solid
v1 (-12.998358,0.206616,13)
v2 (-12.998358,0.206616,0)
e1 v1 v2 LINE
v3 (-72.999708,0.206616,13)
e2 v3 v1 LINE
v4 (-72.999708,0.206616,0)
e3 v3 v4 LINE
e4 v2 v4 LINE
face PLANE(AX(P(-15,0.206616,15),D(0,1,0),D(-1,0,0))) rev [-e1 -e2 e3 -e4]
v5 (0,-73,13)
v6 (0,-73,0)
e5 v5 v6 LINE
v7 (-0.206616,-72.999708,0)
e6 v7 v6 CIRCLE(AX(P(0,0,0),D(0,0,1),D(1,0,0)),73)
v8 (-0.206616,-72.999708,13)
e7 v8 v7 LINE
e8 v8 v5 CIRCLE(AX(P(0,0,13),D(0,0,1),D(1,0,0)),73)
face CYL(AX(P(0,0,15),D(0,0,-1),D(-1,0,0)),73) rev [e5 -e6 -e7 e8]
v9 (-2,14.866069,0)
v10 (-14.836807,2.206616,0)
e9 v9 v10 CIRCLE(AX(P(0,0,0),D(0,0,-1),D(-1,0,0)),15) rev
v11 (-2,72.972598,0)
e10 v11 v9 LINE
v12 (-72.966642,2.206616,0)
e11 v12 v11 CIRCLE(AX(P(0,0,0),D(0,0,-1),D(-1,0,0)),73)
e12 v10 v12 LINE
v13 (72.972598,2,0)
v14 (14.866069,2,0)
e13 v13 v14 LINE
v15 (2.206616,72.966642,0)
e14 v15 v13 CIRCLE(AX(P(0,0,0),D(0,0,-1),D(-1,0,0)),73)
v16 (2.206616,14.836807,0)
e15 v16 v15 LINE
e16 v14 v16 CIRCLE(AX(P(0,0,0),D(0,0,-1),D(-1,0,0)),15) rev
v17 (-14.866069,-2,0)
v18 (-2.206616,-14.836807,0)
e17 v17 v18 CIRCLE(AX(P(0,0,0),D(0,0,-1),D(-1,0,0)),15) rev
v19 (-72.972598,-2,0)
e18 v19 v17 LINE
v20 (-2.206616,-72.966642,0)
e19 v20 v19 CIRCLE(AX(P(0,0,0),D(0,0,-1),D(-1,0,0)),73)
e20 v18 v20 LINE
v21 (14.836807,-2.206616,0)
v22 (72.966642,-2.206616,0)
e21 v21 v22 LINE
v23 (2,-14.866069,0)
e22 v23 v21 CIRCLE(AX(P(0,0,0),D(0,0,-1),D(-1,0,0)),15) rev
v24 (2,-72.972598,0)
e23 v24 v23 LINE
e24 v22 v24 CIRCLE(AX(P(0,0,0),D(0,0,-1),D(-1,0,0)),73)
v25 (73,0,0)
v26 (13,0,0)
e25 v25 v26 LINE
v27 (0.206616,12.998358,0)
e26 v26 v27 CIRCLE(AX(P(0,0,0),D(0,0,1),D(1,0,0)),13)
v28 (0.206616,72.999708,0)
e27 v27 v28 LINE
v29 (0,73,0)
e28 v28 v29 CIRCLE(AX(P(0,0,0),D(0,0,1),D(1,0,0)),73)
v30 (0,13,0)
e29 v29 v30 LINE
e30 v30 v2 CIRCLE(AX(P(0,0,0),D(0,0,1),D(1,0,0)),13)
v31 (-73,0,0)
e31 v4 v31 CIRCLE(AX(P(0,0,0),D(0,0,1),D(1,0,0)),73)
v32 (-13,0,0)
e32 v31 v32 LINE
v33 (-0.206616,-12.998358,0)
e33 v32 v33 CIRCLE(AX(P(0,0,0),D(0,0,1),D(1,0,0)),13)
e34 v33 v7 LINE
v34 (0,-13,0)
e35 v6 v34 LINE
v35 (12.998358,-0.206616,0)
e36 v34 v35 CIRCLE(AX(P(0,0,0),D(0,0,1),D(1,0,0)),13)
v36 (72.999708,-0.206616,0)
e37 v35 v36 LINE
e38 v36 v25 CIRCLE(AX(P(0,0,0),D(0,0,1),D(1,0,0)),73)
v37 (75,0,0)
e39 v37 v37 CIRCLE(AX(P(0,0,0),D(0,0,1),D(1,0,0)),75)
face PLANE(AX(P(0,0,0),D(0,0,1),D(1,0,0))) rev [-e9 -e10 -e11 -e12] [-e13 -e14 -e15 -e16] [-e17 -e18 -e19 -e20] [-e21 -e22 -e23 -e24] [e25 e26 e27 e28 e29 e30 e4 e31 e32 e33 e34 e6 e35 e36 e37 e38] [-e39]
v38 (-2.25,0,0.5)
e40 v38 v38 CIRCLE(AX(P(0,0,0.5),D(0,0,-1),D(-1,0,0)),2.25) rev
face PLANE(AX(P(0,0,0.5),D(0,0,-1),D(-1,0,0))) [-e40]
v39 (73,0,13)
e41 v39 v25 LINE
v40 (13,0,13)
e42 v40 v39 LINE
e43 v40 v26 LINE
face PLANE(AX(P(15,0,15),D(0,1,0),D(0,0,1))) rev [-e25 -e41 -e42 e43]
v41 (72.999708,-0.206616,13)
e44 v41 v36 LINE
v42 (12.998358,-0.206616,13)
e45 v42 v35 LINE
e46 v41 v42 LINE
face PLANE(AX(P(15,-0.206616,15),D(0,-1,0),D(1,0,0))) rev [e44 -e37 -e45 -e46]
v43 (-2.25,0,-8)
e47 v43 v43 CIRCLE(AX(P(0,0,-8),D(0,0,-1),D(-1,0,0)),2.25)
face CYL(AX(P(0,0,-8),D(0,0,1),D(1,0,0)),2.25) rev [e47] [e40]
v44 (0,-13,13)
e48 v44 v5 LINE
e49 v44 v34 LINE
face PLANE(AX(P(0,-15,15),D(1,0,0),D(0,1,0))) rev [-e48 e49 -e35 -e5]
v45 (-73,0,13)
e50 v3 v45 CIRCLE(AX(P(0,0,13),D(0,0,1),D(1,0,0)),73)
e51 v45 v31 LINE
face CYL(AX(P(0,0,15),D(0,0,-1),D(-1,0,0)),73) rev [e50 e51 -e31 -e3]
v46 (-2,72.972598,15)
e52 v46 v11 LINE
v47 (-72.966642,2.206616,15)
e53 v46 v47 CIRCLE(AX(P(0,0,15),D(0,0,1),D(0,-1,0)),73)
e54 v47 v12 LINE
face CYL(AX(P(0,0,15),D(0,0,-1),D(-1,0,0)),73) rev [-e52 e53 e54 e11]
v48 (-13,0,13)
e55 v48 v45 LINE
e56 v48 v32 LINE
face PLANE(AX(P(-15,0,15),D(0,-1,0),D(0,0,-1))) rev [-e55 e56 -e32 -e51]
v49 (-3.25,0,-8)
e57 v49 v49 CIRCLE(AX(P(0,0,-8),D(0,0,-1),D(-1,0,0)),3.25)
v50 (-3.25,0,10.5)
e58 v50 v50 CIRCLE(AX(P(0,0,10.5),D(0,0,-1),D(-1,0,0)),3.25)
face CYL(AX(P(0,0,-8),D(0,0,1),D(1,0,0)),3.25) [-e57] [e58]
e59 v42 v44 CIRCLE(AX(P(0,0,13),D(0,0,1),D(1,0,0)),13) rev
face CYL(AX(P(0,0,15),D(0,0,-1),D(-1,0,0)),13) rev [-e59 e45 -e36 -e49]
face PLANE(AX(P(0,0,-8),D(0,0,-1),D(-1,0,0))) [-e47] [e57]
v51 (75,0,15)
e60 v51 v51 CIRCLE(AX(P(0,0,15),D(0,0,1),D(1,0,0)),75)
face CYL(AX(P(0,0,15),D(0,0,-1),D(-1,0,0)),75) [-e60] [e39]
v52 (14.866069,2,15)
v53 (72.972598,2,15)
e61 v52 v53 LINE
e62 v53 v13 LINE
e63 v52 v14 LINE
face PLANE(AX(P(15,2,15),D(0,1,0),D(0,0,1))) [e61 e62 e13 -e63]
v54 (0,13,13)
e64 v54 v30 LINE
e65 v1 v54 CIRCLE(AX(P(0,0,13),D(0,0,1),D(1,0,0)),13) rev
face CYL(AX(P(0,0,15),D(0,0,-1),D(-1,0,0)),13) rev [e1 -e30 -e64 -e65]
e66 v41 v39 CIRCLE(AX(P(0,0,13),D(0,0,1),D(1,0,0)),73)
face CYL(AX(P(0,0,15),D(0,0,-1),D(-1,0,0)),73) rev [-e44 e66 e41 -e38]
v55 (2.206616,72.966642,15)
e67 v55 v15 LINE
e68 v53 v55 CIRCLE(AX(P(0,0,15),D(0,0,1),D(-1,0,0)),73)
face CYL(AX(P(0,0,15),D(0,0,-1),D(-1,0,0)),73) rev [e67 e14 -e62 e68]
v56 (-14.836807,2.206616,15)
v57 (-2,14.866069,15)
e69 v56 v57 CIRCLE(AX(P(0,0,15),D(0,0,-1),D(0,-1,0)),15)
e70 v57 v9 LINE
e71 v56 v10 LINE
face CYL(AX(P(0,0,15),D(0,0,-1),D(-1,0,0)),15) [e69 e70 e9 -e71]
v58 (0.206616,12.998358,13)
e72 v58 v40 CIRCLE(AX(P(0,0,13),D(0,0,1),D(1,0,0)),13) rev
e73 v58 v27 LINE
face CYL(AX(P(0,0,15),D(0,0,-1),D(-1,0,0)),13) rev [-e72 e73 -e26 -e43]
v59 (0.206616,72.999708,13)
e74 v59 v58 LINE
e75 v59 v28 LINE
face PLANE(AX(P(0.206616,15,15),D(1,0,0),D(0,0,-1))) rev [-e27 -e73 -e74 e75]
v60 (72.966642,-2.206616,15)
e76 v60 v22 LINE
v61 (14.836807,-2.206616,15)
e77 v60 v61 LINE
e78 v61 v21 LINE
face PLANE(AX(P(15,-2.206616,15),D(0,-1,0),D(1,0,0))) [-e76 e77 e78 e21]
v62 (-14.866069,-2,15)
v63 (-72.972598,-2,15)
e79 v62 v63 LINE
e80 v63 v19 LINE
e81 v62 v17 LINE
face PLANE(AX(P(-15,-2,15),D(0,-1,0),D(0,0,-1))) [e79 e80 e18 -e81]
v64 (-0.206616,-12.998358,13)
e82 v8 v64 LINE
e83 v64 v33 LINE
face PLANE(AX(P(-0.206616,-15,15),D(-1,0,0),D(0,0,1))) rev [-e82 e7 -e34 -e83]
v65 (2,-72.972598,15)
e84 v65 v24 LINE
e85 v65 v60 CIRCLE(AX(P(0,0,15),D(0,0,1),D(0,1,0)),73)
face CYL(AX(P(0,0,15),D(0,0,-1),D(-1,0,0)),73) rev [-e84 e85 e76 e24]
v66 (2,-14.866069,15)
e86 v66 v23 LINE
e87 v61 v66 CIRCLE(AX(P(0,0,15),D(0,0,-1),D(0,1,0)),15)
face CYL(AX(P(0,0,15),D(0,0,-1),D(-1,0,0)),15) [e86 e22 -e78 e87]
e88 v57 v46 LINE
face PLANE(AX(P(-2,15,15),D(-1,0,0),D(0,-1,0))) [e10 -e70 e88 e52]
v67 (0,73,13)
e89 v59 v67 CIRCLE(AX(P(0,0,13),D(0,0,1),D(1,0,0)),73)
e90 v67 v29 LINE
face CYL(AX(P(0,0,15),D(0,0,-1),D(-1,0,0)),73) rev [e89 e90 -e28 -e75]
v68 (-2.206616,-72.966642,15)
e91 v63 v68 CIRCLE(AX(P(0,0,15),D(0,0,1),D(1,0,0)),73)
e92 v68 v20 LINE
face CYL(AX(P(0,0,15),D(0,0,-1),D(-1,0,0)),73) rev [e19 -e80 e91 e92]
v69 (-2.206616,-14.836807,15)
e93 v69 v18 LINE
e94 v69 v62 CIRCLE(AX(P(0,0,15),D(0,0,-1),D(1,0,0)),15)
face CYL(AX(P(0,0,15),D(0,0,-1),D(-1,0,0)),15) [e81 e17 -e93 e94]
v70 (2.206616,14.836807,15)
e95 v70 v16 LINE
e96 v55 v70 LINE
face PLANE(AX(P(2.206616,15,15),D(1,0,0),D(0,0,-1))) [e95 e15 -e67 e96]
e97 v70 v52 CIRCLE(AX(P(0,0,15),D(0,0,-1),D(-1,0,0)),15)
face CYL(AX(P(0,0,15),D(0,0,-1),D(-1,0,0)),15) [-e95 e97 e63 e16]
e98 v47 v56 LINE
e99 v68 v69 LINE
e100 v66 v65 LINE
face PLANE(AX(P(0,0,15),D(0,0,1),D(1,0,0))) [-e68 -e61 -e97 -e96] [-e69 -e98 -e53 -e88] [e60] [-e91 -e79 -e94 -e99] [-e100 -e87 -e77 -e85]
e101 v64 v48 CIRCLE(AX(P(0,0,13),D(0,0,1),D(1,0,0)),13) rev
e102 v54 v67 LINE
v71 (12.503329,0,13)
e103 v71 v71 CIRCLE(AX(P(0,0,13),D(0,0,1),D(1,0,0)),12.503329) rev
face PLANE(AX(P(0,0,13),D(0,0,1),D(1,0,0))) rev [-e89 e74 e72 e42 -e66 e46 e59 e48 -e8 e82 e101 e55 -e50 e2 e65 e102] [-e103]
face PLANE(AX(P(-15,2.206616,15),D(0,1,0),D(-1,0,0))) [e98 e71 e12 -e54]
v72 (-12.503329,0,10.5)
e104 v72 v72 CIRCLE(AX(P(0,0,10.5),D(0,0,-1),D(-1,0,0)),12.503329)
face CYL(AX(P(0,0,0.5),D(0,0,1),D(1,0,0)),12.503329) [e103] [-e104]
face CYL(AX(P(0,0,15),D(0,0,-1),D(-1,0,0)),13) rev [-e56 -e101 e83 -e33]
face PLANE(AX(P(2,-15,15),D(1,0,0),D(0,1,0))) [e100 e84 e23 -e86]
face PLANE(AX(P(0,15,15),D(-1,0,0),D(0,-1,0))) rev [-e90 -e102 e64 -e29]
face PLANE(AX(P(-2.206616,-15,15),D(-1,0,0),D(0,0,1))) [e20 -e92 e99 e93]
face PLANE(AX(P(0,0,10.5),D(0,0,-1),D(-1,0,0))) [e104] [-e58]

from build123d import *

# Parameters (mm, degrees)
SKETCH4_R           = 75
BOSS_EXTRUDE2_DEPTH = 15
CUT_EXTRUDE1_DEPTH  = 108.121426428
CIRPATTERN1_COUNT   = 4
SHELL1_DEPTH        = 13
SKETCH7_R           = 12.503328754
BOSS_EXTRUDE3_DEPTH = 12.5
SKETCH8_R           = 3.25
SKETCH8_R_2         = 2.25
BOSS_EXTRUDE4_DEPTH = 8.5
CUT_EXTRUDE2_START  = -10
SKETCH9_R           = 12.503328754
SKETCH9_R_2         = 3.25
CUT_EXTRUDE2_DEPTH  = 10


# Read off the part's stored shape, not the designer's step: Shell1
with BuildPart() as part:
    # Sketch4 → Boss-Extrude2 (new body)
    with BuildSketch(Plane.XY):
        Circle(SKETCH4_R)
    extrude(amount=BOSS_EXTRUDE2_DEPTH)

    # Sketch6 → Cut-Extrude1 (cut, symmetric)
    with BuildSketch(Plane.XY):
        with BuildLine():
            Line((2.206615595, 15), (2.206615595, 69.72932719))
            Line((2.206615595, 69.72932719), (2.206615595, 72.96664202))
            ThreePointArc((2.206615595, 72.96664202), (51.691823279, 51.54566331), (72.972597597, 2))
            Line((72.972597597, 2), (15, 2))
            Line((15, 2), (14.866068747, 2))
            ThreePointArc((14.866068747, 2), (10.680123706, 10.532566526), (2.206615595, 14.836807191))
            Line((2.206615595, 14.836807191), (2.206615595, 15))
        make_face()
    cut_extrude1 = extrude(amount=CUT_EXTRUDE1_DEPTH, both=True, mode=Mode.SUBTRACT)

    # CirPattern1: Cut-Extrude1 ×4 about axis
    cirpattern1_axis = Axis((0, 0, 0), (0, 0, 1))
    for i in range(1, CIRPATTERN1_COUNT):
        add(cut_extrude1.rotate(cirpattern1_axis, i * 360 / CIRPATTERN1_COUNT), mode=Mode.SUBTRACT)

    # Shell1 outline → Shell1 (cut)
    with BuildSketch(Plane.XY):
        with BuildLine():
            ThreePointArc((-0.206615595, -72.999707602), (-0.103307901, -72.9999269), (0, -73))
            Line((0, -73), (0, -13))
            ThreePointArc((0, -13), (9.119045928, -9.26514983), (12.998357973, -0.206615595))
            Line((12.998357973, -0.206615595), (72.999707602, -0.206615595))
            ThreePointArc((72.999707602, -0.206615595), (72.9999269, -0.103307901), (73, 0))
            Line((73, 0), (13, 0))
            ThreePointArc((13, 0), (9.26514983, 9.119045928), (0.206615595, 12.998357973))
            Line((0.206615595, 12.998357973), (0.206615595, 72.999707602))
            ThreePointArc((0.206615595, 72.999707602), (0.103307901, 72.9999269), (0, 73))
            Line((0, 73), (0, 13))
            ThreePointArc((0, 13), (-9.119045928, 9.26514983), (-12.998357973, 0.206615595))
            Line((-12.998357973, 0.206615595), (-72.999707602, 0.206615595))
            ThreePointArc((-72.999707602, 0.206615595), (-72.9999269, 0.103307901), (-73, 0))
            Line((-73, 0), (-13, 0))
            ThreePointArc((-13, 0), (-9.26514983, -9.119045928), (-0.206615595, -12.998357973))
            Line((-0.206615595, -12.998357973), (-0.206615595, -72.999707602))
        make_face()
    extrude(amount=SHELL1_DEPTH, mode=Mode.SUBTRACT)

    # Sketch7 → Boss-Extrude3 (add)
    with BuildSketch(Plane(origin=(0, 0, 13), x_dir=(-1, 0, 0), z_dir=(0, 0, -1))):
        with Locations(Location((0, 0, 0), (0, 0, 180))):
            Circle(SKETCH7_R)
    extrude(amount=BOSS_EXTRUDE3_DEPTH)

    # Sketch8 → Boss-Extrude4 (add)
    with BuildSketch(Plane(origin=(0, 0, 0.5), x_dir=(-1, 0, 0), z_dir=(0, 0, -1))):
        Circle(SKETCH8_R)
        Circle(SKETCH8_R_2, mode=Mode.SUBTRACT)
    extrude(amount=BOSS_EXTRUDE4_DEPTH)

    # Sketch9 → Cut-Extrude2 (cut)
    with BuildSketch(Plane(origin=(0, 0, 0.5), x_dir=(-1, 0, 0), z_dir=(0, 0, -1)).offset(CUT_EXTRUDE2_START)):
        with Locations(Location((0, 0, 0), (0, 0, 180))):
            Circle(SKETCH9_R)
        Circle(SKETCH9_R_2, mode=Mode.SUBTRACT)
    extrude(amount=CUT_EXTRUDE2_DEPTH, mode=Mode.SUBTRACT)


solid = part.part
